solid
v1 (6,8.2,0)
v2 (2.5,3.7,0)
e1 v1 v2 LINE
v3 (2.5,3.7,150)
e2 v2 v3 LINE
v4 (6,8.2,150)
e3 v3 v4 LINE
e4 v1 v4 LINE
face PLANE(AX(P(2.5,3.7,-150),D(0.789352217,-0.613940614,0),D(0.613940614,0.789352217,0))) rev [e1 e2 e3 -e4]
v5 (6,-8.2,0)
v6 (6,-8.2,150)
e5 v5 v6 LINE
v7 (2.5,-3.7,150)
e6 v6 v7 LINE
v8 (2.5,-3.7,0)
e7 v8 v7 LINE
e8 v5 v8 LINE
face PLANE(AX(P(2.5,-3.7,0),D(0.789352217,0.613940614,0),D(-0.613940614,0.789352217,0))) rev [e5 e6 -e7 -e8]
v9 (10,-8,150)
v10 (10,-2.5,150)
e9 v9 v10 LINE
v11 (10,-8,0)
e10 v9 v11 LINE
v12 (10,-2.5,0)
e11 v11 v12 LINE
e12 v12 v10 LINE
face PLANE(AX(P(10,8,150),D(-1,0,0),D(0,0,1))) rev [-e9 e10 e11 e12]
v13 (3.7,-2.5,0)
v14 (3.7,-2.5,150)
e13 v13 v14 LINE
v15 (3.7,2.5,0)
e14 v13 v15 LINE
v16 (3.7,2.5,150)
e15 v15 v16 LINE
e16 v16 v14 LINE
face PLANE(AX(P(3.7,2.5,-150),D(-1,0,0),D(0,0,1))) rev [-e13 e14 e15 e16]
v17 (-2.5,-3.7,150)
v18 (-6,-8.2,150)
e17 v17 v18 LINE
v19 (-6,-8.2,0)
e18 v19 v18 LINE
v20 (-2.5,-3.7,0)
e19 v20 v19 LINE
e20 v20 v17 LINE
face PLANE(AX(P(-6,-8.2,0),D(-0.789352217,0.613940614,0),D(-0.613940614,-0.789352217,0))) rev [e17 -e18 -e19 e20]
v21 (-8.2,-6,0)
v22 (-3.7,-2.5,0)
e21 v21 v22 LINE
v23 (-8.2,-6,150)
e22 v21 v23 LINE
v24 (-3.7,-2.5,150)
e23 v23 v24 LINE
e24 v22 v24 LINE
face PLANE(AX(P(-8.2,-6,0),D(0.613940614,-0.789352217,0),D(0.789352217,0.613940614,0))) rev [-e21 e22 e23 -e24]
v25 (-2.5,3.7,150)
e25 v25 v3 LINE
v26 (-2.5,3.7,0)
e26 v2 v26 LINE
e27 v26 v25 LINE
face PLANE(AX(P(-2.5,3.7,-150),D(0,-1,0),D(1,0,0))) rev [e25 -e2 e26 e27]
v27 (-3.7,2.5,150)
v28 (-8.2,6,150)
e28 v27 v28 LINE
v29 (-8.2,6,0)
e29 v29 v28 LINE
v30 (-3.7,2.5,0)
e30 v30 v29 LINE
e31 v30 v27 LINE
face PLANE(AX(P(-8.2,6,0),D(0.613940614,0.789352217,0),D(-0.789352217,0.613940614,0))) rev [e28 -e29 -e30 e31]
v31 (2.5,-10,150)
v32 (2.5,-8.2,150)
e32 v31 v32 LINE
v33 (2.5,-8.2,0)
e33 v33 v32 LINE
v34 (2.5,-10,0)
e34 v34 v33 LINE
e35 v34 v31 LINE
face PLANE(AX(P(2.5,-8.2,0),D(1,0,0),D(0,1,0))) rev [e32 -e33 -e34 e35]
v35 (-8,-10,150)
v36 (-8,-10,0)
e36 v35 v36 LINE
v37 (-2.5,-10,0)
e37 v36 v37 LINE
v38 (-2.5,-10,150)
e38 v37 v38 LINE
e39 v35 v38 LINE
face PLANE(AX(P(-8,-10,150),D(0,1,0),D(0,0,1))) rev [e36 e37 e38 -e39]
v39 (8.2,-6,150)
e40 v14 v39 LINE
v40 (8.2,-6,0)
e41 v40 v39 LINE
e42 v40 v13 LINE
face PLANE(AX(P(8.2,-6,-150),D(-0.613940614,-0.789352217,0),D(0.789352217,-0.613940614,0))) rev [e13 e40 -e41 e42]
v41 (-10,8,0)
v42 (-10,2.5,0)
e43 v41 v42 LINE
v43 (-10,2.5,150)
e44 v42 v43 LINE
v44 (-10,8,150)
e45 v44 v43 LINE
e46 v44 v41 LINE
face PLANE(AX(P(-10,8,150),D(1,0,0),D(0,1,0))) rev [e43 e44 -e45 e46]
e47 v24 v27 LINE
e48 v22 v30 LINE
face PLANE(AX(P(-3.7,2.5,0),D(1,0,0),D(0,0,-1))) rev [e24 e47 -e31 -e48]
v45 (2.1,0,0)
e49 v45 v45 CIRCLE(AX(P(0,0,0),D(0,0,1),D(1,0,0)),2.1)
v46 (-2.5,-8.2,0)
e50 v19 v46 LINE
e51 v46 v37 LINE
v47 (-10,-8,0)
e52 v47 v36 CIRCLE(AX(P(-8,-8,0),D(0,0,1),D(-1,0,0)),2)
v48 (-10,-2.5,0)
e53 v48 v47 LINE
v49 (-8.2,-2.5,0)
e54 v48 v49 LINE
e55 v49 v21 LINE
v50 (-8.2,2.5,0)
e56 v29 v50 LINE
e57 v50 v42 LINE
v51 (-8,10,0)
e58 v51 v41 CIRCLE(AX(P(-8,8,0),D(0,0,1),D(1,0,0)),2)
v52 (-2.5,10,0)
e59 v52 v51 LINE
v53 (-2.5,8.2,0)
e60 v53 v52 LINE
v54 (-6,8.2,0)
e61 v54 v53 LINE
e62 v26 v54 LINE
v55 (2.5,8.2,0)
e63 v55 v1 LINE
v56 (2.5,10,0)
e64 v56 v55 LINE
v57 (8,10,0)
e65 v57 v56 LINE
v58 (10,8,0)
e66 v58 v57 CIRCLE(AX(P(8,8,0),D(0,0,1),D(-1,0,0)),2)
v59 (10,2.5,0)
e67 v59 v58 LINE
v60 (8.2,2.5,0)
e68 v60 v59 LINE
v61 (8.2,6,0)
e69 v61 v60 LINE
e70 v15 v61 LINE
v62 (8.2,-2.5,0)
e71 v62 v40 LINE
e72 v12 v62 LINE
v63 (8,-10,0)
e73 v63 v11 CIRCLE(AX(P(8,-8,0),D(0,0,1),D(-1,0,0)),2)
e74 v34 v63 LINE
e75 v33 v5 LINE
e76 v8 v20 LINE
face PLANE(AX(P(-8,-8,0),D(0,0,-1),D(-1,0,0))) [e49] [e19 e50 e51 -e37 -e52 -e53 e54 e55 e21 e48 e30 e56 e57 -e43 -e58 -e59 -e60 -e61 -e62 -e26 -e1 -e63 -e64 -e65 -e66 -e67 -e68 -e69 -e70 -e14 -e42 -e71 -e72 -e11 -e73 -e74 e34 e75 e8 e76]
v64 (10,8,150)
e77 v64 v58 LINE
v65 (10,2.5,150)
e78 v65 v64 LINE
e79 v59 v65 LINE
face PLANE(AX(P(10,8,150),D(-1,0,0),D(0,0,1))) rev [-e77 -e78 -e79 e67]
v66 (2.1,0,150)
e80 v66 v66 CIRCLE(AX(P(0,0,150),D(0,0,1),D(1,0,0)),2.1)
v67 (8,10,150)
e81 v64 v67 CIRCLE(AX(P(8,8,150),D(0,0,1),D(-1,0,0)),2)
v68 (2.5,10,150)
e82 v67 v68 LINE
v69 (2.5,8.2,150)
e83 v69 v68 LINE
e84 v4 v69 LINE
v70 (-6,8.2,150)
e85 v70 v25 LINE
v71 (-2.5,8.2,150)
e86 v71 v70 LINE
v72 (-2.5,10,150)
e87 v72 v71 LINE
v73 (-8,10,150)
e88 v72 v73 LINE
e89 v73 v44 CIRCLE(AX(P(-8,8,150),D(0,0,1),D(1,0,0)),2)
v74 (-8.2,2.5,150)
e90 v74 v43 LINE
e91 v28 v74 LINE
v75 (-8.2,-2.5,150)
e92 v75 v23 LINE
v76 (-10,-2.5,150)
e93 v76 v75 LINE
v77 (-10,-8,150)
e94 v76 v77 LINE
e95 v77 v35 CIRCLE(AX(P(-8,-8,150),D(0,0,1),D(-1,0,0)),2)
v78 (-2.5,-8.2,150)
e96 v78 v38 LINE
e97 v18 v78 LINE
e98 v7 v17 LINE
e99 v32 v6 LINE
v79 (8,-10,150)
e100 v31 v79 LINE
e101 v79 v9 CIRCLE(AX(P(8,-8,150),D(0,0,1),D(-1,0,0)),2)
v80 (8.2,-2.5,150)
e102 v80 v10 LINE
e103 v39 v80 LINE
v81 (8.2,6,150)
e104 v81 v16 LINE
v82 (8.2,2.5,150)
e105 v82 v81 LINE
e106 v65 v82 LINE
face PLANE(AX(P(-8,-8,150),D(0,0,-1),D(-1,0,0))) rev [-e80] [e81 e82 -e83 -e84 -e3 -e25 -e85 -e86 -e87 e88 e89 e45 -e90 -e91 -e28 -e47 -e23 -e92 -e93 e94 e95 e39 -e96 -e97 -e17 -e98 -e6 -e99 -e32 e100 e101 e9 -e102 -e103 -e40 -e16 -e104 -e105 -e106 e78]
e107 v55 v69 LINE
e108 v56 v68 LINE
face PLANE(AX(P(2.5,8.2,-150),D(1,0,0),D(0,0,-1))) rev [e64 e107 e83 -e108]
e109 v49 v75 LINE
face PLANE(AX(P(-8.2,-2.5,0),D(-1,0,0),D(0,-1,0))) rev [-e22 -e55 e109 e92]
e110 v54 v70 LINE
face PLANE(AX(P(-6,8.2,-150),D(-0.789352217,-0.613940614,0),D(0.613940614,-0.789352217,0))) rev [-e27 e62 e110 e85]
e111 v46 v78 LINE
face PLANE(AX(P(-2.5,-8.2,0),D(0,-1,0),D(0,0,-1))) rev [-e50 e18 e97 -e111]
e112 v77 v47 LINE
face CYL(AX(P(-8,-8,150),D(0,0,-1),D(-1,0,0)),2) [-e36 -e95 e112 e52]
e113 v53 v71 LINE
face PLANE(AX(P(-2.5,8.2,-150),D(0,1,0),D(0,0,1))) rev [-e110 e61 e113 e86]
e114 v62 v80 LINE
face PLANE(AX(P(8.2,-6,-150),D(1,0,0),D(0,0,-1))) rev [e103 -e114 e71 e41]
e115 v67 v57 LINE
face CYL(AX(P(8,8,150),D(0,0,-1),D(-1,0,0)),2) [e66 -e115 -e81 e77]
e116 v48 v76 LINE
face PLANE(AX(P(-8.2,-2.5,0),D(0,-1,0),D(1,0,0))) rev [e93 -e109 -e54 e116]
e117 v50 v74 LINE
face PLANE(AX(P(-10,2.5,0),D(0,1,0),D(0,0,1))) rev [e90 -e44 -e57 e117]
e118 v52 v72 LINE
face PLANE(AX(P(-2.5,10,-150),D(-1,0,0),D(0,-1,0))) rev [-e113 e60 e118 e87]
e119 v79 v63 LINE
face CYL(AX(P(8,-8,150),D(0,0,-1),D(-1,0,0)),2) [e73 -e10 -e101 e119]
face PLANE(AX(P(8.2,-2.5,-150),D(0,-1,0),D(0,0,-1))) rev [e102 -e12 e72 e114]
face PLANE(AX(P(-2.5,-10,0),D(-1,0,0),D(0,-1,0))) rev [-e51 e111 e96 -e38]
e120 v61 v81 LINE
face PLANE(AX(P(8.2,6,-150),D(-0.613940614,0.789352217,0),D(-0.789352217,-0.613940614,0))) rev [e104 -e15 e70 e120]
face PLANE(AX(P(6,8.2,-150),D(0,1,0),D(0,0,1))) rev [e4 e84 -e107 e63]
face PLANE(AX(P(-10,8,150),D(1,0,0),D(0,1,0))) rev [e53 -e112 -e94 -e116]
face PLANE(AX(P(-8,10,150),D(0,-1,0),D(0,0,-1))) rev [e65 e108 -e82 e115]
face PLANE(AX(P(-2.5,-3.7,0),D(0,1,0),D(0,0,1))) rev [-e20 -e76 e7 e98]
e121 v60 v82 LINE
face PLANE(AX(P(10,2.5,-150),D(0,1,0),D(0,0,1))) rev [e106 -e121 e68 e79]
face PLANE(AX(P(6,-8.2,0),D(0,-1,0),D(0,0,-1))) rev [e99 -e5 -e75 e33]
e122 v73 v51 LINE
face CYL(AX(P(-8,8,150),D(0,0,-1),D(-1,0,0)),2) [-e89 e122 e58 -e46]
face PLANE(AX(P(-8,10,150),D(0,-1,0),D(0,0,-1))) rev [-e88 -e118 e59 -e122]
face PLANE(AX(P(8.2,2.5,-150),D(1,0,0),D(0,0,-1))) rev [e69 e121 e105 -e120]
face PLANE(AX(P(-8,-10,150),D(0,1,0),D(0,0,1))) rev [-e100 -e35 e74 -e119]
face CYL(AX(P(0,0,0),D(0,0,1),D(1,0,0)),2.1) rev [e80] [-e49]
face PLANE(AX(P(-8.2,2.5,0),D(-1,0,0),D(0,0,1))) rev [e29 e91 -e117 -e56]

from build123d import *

# Parameters (mm, degrees)
EXTRUSION1_DEPTH        = 150
PER_AGE1_OUTLINE_R      = 2.1
PER_AGE1_DEPTH          = 150
ENL_V_MAT_EXTRU_1_DEPTH = 300
ENL_V_MAT_EXTRU_3_DEPTH = 300
ENL_V_MAT_EXTRU_4_DEPTH = 151.665191733
ENL_V_MAT_EXTRU_7_DEPTH = 151.665191733


# Read off the part's stored shape, not the designer's step: Perçage1
with BuildPart() as part:
    # Esquisse1 → Extrusion1 (new body)
    with BuildSketch(Plane.XY):
        with BuildLine():
            Line((-10, 8), (-10, -8))
            ThreePointArc((-10, -8), (-9.414213562, -9.414213562), (-8, -10))
            Line((-8, -10), (8, -10))
            ThreePointArc((8, -10), (9.414213562, -9.414213562), (10, -8))
            Line((10, -8), (10, 8))
            ThreePointArc((10, 8), (9.414213562, 9.414213562), (8, 10))
            Line((8, 10), (-8, 10))
            ThreePointArc((-8, 10), (-9.414213562, 9.414213562), (-10, 8))
        make_face()
    extrude(amount=EXTRUSION1_DEPTH)

    # Perçage1 outline → Perçage1 (cut)
    with BuildSketch(Plane.XY):
        Circle(PER_AGE1_OUTLINE_R)
    extrude(amount=PER_AGE1_DEPTH, mode=Mode.SUBTRACT)

    # Esquisse3 → Enlèv. mat.-Extru.1 (cut)
    with BuildSketch(Plane.XY.offset(150)):
        Polygon((10, 2.5), (8.2, 2.5), (8.2, 6), (3.7, 2.5), (3.7, -2.5), (8.2, -6), (8.2, -2.5), (10, -2.5), align=None)
    extrude(amount=-ENL_V_MAT_EXTRU_1_DEPTH, mode=Mode.SUBTRACT)

    # Esquisse5 → Enlèv. mat.-Extru.3 (cut)
    with BuildSketch(Plane.XY.offset(150)):
        Polygon((-2.5, 10), (-2.5, 8.2), (-6, 8.2), (-2.5, 3.7), (2.5, 3.7), (6, 8.2), (2.5, 8.2), (2.5, 10), align=None)
    extrude(amount=-ENL_V_MAT_EXTRU_3_DEPTH, mode=Mode.SUBTRACT)

    # Esquisse6 → Enlèv. mat.-Extru.4 (cut, through all)
    with BuildSketch(Plane.XY.offset(150)):
        Polygon((-2.5, -10), (-2.5, -8.2), (-6, -8.2), (-2.5, -3.7), (2.5, -3.7), (6, -8.2), (2.5, -8.2), (2.5, -10), align=None)
    extrude(amount=-ENL_V_MAT_EXTRU_4_DEPTH, mode=Mode.SUBTRACT)

    # Esquisse4 → Enlèv. mat.-Extru.7 (cut, through all)
    with BuildSketch(Plane.XY.offset(150)):
        Polygon((-10, 2.5), (-8.2, 2.5), (-8.2, 6), (-3.7, 2.5), (-3.7, -2.5), (-8.2, -6), (-8.2, -2.5), (-10, -2.5), align=None)
    extrude(amount=-ENL_V_MAT_EXTRU_7_DEPTH, mode=Mode.SUBTRACT)


solid = part.part
